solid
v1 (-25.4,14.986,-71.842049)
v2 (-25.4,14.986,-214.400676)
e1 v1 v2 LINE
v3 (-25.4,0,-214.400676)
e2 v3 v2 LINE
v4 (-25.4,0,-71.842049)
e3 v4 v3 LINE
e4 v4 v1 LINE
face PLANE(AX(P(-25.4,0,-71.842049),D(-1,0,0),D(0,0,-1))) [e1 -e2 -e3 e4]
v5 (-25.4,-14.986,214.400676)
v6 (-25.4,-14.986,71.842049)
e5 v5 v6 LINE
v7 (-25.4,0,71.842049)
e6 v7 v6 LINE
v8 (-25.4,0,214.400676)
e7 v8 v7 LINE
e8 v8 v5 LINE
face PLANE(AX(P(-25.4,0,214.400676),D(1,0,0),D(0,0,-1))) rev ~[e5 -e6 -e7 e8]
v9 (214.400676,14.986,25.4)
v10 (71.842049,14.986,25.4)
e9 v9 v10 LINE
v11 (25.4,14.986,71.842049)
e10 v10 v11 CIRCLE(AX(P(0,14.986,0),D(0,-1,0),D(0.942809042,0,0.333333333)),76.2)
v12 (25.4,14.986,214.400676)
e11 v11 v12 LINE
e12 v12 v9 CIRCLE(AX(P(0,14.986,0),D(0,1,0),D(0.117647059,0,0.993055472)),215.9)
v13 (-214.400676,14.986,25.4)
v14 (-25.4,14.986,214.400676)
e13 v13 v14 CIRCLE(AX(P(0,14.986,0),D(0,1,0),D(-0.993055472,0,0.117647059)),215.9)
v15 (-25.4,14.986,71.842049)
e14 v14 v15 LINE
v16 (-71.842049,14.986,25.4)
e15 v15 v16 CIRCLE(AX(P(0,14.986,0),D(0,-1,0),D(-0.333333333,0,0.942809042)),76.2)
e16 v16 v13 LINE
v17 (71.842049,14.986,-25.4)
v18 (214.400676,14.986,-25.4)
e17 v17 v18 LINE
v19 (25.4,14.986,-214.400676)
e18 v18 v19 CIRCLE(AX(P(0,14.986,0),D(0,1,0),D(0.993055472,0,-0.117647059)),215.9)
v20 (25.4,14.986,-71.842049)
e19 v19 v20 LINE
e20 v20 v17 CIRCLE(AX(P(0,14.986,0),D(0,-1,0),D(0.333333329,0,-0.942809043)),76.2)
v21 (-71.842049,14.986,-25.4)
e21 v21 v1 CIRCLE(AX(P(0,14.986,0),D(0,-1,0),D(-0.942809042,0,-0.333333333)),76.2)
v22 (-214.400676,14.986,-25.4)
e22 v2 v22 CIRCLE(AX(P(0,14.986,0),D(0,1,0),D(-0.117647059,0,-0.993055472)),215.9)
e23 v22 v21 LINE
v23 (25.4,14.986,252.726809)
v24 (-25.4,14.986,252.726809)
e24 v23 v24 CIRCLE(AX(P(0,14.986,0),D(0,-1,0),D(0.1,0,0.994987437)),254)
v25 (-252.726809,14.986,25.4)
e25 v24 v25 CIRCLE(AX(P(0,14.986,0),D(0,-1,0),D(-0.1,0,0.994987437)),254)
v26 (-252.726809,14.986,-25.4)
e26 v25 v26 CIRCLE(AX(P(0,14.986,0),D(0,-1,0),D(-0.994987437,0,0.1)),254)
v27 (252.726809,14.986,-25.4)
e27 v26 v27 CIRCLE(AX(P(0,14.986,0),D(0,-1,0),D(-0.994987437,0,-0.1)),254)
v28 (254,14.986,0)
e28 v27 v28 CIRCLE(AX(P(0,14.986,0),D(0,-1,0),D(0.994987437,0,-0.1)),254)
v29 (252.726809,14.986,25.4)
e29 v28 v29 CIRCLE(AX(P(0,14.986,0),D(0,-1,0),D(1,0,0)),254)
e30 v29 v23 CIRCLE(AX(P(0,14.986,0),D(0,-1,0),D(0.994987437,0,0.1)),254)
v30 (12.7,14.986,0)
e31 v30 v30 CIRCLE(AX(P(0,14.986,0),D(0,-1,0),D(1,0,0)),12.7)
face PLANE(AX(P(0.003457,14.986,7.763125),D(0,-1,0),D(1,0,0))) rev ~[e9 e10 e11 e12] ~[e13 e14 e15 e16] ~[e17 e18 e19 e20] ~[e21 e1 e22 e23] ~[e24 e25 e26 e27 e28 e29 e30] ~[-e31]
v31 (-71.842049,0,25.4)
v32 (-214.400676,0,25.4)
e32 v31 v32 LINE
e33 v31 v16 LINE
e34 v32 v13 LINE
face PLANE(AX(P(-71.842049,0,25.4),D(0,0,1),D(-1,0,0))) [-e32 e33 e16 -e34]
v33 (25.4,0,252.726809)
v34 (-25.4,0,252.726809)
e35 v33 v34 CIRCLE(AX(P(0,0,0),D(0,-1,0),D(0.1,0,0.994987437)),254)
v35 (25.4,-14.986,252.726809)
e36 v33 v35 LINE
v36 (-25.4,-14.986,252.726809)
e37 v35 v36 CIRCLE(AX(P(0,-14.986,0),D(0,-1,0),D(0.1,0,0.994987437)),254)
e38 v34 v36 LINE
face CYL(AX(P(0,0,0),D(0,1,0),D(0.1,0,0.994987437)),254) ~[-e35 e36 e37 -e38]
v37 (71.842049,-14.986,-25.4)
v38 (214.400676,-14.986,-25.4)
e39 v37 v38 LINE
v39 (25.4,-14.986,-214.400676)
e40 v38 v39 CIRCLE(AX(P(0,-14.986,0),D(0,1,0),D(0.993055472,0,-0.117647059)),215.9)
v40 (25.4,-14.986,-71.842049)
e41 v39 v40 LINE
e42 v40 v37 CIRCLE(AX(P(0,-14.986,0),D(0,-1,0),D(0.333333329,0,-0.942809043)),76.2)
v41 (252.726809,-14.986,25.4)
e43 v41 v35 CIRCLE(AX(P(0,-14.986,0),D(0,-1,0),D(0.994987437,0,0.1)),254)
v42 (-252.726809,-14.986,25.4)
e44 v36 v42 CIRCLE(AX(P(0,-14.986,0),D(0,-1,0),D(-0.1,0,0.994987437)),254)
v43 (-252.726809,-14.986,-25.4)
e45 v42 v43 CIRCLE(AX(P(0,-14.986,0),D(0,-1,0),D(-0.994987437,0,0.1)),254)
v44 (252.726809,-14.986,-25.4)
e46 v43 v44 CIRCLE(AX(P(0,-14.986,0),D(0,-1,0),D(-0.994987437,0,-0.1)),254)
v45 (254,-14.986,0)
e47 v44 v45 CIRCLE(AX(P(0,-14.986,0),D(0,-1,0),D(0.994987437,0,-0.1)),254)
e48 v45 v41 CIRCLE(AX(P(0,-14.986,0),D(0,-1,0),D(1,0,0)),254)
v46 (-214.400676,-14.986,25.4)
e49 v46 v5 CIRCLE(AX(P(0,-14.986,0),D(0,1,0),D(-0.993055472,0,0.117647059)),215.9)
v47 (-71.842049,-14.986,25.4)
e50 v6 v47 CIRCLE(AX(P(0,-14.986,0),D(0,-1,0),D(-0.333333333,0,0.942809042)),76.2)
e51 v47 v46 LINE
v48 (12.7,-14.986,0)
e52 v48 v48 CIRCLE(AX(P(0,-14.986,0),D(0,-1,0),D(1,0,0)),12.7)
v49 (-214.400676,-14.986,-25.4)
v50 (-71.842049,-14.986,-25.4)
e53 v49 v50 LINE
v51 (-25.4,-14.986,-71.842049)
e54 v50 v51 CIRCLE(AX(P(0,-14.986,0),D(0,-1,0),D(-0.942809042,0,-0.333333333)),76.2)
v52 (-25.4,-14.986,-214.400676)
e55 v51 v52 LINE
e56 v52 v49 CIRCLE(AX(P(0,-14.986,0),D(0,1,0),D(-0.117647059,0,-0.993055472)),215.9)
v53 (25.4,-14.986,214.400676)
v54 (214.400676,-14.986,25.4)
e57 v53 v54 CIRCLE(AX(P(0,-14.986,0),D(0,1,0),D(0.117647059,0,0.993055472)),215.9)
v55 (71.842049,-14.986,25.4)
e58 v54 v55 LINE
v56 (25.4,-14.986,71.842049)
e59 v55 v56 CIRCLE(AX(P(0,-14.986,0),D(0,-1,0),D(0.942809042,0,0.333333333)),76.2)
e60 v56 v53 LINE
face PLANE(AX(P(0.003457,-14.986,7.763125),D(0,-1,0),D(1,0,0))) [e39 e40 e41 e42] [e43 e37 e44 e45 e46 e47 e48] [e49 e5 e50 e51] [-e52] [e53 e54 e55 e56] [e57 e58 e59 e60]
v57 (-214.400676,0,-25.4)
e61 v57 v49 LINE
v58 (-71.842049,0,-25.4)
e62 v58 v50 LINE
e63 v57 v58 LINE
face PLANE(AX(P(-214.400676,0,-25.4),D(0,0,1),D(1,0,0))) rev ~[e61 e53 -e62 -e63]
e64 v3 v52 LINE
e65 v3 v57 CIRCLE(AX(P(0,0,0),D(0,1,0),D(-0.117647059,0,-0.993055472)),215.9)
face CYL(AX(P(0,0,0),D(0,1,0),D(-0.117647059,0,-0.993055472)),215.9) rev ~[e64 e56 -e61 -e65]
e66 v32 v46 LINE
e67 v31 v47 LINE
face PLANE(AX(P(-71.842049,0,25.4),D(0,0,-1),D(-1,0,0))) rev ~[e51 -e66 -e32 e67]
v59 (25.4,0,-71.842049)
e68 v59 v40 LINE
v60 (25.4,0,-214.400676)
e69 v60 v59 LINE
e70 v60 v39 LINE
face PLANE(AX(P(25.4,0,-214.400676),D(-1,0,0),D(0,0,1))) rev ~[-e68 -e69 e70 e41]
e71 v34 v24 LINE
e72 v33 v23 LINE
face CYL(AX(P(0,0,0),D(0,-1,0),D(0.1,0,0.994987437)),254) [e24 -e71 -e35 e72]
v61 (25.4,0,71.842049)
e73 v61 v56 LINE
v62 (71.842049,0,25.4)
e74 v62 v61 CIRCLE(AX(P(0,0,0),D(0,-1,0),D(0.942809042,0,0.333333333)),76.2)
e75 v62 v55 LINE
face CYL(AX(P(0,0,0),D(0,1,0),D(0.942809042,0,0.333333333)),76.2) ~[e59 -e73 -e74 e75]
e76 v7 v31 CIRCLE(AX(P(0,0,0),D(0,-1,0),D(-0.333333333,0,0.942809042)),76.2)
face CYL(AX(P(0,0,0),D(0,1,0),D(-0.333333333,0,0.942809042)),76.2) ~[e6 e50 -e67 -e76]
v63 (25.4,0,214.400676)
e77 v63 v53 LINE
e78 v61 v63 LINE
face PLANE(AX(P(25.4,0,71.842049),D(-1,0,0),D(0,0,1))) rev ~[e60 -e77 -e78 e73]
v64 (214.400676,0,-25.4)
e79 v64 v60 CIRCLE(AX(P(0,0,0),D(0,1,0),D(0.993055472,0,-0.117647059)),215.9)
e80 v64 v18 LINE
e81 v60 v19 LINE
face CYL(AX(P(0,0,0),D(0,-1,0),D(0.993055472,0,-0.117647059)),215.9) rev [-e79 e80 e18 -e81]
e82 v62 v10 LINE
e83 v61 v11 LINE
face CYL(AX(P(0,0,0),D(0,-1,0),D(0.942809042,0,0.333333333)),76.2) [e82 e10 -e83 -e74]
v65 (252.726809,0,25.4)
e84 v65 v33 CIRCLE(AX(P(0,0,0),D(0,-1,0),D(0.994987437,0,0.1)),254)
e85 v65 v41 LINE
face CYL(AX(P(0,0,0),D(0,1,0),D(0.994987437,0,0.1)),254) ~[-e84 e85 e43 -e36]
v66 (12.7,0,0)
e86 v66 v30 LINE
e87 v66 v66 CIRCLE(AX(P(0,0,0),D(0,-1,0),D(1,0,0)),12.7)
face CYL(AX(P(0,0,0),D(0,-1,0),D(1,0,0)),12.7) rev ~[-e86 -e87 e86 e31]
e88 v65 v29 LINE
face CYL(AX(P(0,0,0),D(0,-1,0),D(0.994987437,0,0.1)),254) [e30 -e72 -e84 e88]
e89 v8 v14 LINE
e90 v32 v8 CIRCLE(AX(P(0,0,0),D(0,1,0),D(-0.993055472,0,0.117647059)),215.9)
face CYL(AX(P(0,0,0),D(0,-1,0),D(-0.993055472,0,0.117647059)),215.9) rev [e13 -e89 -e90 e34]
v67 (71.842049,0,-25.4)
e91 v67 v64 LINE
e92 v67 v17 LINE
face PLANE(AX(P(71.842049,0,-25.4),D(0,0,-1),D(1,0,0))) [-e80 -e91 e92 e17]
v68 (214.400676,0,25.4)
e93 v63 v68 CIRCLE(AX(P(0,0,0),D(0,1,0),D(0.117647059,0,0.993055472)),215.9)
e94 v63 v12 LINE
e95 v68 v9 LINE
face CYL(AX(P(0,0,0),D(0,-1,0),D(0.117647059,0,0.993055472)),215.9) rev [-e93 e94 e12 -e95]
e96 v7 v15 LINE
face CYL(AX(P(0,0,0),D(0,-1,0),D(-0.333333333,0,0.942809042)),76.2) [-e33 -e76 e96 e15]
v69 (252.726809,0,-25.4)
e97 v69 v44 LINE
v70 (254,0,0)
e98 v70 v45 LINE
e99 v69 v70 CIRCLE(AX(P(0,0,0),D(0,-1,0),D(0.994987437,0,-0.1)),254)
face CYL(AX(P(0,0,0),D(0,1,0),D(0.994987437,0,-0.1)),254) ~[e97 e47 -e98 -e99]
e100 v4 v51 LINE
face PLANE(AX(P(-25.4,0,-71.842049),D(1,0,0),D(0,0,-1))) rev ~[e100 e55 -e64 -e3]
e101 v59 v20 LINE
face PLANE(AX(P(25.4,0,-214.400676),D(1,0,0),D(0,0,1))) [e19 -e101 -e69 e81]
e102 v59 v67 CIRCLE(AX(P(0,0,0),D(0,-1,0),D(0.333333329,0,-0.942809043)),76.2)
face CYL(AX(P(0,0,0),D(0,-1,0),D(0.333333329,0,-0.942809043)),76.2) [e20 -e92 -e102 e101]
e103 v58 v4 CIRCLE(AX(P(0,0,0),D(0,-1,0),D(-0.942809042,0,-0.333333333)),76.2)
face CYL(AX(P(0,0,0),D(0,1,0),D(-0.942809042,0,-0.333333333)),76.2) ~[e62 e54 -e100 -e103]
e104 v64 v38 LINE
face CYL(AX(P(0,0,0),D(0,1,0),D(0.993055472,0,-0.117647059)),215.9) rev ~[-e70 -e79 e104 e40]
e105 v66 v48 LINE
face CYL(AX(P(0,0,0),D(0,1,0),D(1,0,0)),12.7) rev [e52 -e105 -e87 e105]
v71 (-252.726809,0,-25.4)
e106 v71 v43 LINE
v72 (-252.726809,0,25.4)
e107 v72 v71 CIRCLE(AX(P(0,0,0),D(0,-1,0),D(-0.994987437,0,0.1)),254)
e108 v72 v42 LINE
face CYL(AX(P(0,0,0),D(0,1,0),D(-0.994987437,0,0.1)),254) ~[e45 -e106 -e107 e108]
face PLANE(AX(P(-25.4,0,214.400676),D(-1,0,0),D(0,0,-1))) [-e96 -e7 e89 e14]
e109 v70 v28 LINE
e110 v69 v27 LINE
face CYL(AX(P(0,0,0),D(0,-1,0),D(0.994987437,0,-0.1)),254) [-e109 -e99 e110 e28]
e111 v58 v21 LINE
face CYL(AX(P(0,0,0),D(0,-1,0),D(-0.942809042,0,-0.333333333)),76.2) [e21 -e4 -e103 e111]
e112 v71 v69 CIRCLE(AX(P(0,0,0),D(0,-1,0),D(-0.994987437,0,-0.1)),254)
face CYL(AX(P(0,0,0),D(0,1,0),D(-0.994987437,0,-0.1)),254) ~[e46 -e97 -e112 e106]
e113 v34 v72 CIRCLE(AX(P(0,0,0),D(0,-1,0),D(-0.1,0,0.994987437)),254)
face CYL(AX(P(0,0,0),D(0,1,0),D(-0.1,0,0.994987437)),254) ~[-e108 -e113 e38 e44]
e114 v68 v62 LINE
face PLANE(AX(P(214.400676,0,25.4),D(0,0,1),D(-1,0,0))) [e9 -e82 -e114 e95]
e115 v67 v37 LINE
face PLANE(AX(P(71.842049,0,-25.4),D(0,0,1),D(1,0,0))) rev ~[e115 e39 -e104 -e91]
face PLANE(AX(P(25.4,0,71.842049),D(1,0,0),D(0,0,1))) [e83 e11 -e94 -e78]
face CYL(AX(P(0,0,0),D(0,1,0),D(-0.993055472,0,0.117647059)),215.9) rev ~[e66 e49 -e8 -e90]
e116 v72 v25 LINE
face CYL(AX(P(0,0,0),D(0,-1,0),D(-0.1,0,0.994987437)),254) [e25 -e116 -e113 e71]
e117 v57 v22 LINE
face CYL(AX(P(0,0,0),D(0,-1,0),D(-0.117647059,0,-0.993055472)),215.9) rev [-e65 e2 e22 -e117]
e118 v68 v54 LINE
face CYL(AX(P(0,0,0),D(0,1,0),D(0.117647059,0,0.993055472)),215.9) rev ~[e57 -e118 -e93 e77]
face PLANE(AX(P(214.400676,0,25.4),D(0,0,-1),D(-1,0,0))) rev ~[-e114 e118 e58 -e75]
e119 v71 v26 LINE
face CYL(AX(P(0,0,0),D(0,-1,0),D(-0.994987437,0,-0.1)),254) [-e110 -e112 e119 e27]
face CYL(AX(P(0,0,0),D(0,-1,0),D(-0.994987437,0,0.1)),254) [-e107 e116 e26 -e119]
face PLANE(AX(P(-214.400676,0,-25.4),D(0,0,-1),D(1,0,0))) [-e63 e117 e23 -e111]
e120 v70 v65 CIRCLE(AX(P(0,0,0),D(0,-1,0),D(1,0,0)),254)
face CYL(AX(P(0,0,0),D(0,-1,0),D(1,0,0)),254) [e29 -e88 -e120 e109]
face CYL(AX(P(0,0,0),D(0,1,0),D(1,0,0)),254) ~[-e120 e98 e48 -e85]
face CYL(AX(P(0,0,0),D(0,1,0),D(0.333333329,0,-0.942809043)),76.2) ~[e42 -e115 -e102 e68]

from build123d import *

# Parameters (mm, degrees)
F0_R     = 12.7
F1_DEPTH = 14.986


# Not quite as in the source:
# - a feature names something its author has since deleted; it is built from what else it names


with BuildPart() as f1:
    # F0 (on Front) → F1 (new body, symmetric)
    with BuildSketch(Plane.XZ):
        with BuildLine():
            ThreePointArc((252.7268090251, -25.4), (253.68150257, -12.7159448652), (254, 0))
            ThreePointArc((254, 0), (253.68150257, 12.7159448652), (252.7268090251, 25.4))
            ThreePointArc((252.7268090251, 25.4), (179.6051224214, 179.6051224214), (25.4, 252.7268090251))
            ThreePointArc((25.4, 252.7268090251), (0, 254), (-25.4, 252.7268090251))
            ThreePointArc((-25.4, 252.7268090251), (-179.6051224214, 179.6051224214), (-252.7268090251, 25.4))
            ThreePointArc((-252.7268090251, 25.4), (-254, 0), (-252.7268090251, -25.4))
            ThreePointArc((-252.7268090251, -25.4), (-179.6051224214, -179.6051224214), (-25.4, -252.7268090251))
            ThreePointArc((-25.4, -252.7268090251), (-1.543e-07, -254), (25.399999693, -252.7268090559))
            ThreePointArc((25.399999693, -252.7268090559), (179.6051223123, -179.6051225305), (252.7268090251, -25.4))
        make_face()
        with BuildLine():
            ThreePointArc((-25.4, -214.4006763049), (-152.6643540582, -152.6643540582), (-214.4006763049, -25.4))
            Line((-214.4006763049, -25.4), (-71.8420489686, -25.4))
            ThreePointArc((-71.8420489686, -25.4), (-53.8815367264, -53.8815367264), (-25.4, -71.8420489686))
            Line((-25.4, -71.8420489686), (-25.4, -214.4006763049))
        make_face(mode=Mode.SUBTRACT)
        with BuildLine():
            ThreePointArc((25.399999693, -71.8420490771), (53.8815366113, -53.8815368415), (71.8420489686, -25.4))
            Line((71.8420489686, -25.4), (214.4006763049, -25.4))
            ThreePointArc((214.4006763049, -25.4), (152.6643539489, -152.6643541675), (25.399999693, -214.4006763413))
            Line((25.399999693, -214.4006763413), (25.399999693, -71.8420490771))
        make_face(mode=Mode.SUBTRACT)
        with BuildLine():
            Line((-25.4, 214.4006763049), (-25.4, 71.8420489686))
            ThreePointArc((-25.4, 71.8420489686), (-53.8815367264, 53.8815367264), (-71.8420489686, 25.4))
            Line((-71.8420489686, 25.4), (-214.4006763049, 25.4))
            ThreePointArc((-214.4006763049, 25.4), (-152.6643540582, 152.6643540582), (-25.4, 214.4006763049))
        make_face(mode=Mode.SUBTRACT)
        Circle(F0_R, mode=Mode.SUBTRACT)
        with BuildLine():
            ThreePointArc((71.8420489686, 25.4), (53.8815367264, 53.8815367264), (25.4, 71.8420489686))
            Line((25.4, 71.8420489686), (25.4, 214.4006763049))
            ThreePointArc((25.4, 214.4006763049), (152.6643540582, 152.6643540582), (214.4006763049, 25.4))
            Line((214.4006763049, 25.4), (71.8420489686, 25.4))
        make_face(mode=Mode.SUBTRACT)
    extrude(amount=F1_DEPTH, both=True)


solid = f1.part
